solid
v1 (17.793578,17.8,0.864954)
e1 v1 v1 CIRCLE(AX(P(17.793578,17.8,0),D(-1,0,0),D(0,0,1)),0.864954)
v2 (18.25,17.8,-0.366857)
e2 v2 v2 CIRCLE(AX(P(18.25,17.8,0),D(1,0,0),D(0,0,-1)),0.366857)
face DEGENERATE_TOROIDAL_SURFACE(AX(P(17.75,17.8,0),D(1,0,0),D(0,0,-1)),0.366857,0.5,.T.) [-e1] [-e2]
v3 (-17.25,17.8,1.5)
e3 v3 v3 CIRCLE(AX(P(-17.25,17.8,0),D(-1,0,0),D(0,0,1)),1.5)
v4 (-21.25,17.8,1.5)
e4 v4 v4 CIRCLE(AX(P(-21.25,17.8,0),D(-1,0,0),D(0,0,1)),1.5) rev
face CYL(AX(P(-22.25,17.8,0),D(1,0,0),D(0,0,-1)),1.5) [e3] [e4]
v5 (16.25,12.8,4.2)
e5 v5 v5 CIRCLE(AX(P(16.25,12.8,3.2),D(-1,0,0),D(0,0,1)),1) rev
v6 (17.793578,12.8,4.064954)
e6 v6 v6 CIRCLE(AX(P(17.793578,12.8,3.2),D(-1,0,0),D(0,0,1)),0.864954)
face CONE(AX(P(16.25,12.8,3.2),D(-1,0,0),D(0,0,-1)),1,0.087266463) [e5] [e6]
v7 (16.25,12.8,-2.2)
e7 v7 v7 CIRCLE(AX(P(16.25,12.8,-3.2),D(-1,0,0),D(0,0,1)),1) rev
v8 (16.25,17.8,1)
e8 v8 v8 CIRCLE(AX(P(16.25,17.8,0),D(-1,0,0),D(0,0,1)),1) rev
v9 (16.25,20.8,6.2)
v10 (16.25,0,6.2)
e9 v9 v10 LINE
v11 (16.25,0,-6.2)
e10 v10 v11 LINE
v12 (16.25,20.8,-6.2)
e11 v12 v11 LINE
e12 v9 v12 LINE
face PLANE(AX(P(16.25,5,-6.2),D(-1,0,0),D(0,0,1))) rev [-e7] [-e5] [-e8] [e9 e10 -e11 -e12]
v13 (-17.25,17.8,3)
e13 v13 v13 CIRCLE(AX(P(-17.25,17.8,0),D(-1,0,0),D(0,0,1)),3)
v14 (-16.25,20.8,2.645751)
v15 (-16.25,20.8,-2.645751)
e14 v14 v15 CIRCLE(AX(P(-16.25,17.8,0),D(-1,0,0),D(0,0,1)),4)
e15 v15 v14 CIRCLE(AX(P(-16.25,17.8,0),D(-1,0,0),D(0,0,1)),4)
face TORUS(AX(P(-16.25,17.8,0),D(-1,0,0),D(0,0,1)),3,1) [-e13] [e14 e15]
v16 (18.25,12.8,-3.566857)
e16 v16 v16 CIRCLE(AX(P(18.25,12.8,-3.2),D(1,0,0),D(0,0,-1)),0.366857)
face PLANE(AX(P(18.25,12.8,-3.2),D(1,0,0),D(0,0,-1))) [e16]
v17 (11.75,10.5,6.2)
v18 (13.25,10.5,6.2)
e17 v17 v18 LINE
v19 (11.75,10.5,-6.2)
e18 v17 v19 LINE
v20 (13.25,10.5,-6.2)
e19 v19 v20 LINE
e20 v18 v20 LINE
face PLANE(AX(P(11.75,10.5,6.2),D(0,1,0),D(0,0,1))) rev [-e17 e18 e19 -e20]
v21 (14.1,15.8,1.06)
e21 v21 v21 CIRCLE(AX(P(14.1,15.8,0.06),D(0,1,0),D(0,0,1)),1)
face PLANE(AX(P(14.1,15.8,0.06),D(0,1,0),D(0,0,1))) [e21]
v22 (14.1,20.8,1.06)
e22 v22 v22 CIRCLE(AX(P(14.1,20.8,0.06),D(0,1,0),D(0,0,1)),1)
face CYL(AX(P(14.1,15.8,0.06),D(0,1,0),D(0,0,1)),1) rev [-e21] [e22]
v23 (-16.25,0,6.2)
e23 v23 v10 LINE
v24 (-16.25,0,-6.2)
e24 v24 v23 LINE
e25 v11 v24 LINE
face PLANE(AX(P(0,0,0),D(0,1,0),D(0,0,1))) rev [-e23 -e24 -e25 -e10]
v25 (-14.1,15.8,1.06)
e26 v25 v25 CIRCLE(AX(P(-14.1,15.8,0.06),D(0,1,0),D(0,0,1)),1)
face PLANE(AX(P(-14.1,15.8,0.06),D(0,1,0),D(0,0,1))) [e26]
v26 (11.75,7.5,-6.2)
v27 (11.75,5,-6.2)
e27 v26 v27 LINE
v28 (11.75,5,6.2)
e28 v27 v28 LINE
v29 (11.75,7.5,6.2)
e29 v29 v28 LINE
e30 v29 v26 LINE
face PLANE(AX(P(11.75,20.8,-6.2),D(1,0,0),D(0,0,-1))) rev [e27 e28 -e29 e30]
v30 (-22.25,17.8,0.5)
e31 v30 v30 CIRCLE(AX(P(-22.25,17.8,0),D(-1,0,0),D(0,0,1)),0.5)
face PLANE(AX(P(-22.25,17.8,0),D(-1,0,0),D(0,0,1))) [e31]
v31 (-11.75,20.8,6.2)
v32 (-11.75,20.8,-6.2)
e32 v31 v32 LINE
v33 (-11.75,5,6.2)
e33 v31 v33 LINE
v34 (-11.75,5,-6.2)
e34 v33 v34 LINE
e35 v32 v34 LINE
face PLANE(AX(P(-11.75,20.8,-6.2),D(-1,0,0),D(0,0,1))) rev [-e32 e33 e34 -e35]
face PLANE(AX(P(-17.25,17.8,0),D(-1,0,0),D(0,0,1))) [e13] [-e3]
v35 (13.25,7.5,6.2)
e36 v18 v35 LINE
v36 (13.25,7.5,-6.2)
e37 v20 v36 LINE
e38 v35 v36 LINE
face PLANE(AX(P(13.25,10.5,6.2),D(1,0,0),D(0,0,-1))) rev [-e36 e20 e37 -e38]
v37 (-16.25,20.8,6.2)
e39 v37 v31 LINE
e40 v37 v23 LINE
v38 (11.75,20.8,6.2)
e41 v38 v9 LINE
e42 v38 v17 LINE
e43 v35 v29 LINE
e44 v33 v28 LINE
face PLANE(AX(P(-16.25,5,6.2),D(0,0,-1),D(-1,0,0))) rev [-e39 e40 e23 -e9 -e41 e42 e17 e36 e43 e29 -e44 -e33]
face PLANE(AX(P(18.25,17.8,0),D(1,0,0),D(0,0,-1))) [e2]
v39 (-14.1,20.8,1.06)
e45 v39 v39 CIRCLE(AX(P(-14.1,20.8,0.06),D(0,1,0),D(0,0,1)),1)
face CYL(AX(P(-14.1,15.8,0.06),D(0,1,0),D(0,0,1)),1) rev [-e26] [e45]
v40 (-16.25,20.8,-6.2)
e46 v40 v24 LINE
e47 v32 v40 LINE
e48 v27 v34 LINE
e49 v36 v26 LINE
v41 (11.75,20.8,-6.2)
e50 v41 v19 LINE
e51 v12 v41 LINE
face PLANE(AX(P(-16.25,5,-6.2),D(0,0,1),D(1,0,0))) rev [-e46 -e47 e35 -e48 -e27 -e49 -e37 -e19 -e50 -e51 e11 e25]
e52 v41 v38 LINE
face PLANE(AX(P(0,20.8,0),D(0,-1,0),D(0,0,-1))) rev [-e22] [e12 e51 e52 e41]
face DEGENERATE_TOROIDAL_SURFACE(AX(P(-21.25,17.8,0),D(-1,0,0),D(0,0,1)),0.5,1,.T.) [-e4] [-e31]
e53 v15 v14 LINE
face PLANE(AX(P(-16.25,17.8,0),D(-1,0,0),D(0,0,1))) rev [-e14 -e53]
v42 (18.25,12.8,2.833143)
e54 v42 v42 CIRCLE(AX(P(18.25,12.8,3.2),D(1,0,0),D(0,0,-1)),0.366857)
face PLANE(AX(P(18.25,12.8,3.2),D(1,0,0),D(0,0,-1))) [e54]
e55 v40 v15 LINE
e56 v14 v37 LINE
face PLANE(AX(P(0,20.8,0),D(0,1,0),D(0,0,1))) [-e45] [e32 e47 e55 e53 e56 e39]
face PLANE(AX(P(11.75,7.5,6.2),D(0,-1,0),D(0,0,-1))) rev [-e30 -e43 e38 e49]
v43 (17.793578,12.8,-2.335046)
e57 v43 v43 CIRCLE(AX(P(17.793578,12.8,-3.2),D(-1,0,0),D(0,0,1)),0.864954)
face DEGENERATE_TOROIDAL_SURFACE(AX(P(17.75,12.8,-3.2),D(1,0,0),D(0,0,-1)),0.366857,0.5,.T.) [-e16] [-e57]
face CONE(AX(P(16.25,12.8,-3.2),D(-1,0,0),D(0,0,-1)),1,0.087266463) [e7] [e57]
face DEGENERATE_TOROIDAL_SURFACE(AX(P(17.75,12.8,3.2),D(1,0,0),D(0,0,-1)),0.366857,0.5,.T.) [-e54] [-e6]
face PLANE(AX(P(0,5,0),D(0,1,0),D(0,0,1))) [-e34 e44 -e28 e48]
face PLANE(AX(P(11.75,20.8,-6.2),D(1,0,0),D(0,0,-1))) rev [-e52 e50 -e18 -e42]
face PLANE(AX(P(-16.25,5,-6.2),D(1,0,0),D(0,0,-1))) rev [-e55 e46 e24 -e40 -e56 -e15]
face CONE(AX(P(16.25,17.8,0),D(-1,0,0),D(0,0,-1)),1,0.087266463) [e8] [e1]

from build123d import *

# Parameters (mm, degrees)
SKETCH1_W                     = 32.5
SKETCH1_H                     = 12.4
BOSS_EXTRUDE1_DEPTH           = 5
SKETCH3_W                     = 4.5
SKETCH3_H                     = 12.4
BOSS_EXTRUDE2_DEPTH           = 15.8
SKETCH4_R                     = 1
CUT_EXTRUDE1_DEPTH            = 5
SKETCH5_R                     = 1
BOSS_EXTRUDE3_DEPTH           = 2
BOSS_EXTRUDE3_DRAFT           = 5
BOSS_EXTRUDE3_PROFILE_2_DEPTH = 2
BOSS_EXTRUDE3_PROFILE_2_DRAFT = 5
BOSS_EXTRUDE3_PROFILE_3_DEPTH = 2
BOSS_EXTRUDE3_PROFILE_3_DRAFT = 5
SKETCH6_R                     = 4
BOSS_EXTRUDE4_DEPTH           = 1
SKETCH7_R                     = 1.5
BOSS_EXTRUDE5_DEPTH           = 5
FILLET1_R                     = 1
FILLET2_R                     = 1
FILLET3_R                     = 0.5
SKETCH10_W                    = 1.5
SKETCH10_H                    = 3
CUT_EXTRUDE4_DEPTH            = 34.527041325


with BuildPart() as part:
    # Sketch1 → Boss-Extrude1 (new body)
    with BuildSketch(Plane(origin=(0, 0, 0), x_dir=(1, 0, 0), z_dir=(0, 1, 0))):
        Rectangle(SKETCH1_W, SKETCH1_H)
    extrude(amount=BOSS_EXTRUDE1_DEPTH)

    # Sketch3 → Boss-Extrude2 (add)
    with BuildSketch(Plane(origin=(0, 5, 0), x_dir=(1, 0, 0), z_dir=(0, 1, 0))):
        with Locations((-14, 0)):
            Rectangle(SKETCH3_W, SKETCH3_H)
        with Locations((14, 0)):
            Rectangle(SKETCH3_W, SKETCH3_H)
    extrude(amount=BOSS_EXTRUDE2_DEPTH)

    # Sketch4 → Cut-Extrude1 (cut)
    with BuildSketch(Plane(origin=(0, 20.8, 0), x_dir=(1, 0, 0), z_dir=(0, 1, 0))):
        with Locations(Location((14.1, -0.06, 0), (0, 0, 270))):
            Circle(SKETCH4_R)
        with Locations(Location((-14.1, -0.06, 0), (0, 0, 270))):
            Circle(SKETCH4_R)
    extrude(amount=-CUT_EXTRUDE1_DEPTH, mode=Mode.SUBTRACT)


with BuildPart() as boss_extrude3_tool:
    # Sketch5 → Boss-Extrude3 (with draft: the straight prism first)
    with BuildSketch(Plane(origin=(16.25, 0, 0), x_dir=(0, 0, -1), z_dir=(1, 0, 0))):
        with Locations((0, 17.8)):
            Circle(SKETCH5_R)
    extrude(amount=BOSS_EXTRUDE3_DEPTH)
    # Boss-Extrude3: the draft: its side faces are tilted about the plane it starts from
    boss_extrude3_sides = [boss_extrude3_tool.faces().sort_by_distance(p)[0] for p in [
        (17.25, 17.8, 1),
    ]]
    draft(boss_extrude3_sides, Plane(origin=(16.25, 0, 0), x_dir=(0, 0, -1), z_dir=(1, 0, 0)), BOSS_EXTRUDE3_DRAFT)


with BuildPart() as part_1:
    add(part.part)

    # Boss-Extrude3: add boss_extrude3_tool
    add(boss_extrude3_tool.part)


with BuildPart() as boss_extrude3_profile_2_tool:
    # Sketch5 → Boss-Extrude3 profile 2 (with draft: the straight prism first)
    with BuildSketch(Plane(origin=(16.25, 0, 0), x_dir=(0, 0, -1), z_dir=(1, 0, 0))):
        with Locations((3.2, 12.8)):
            Circle(SKETCH5_R)
    extrude(amount=BOSS_EXTRUDE3_PROFILE_2_DEPTH)
    # Boss-Extrude3 profile 2: the draft: its side faces are tilted about the plane it starts from
    boss_extrude3_profile_2_sides = [boss_extrude3_profile_2_tool.faces().sort_by_distance(p)[0] for p in [
        (17.25, 12.8, -2.2),
    ]]
    draft(boss_extrude3_profile_2_sides, Plane(origin=(16.25, 0, 0), x_dir=(0, 0, -1), z_dir=(1, 0, 0)), BOSS_EXTRUDE3_PROFILE_2_DRAFT)


with BuildPart() as part_2:
    add(part_1.part)

    # Boss-Extrude3 profile 2: add boss_extrude3_profile_2_tool
    add(boss_extrude3_profile_2_tool.part)


with BuildPart() as boss_extrude3_profile_3_tool:
    # Sketch5 → Boss-Extrude3 profile 3 (with draft: the straight prism first)
    with BuildSketch(Plane(origin=(16.25, 0, 0), x_dir=(0, 0, -1), z_dir=(1, 0, 0))):
        with Locations((-3.2, 12.8)):
            Circle(SKETCH5_R)
    extrude(amount=BOSS_EXTRUDE3_PROFILE_3_DEPTH)
    # Boss-Extrude3 profile 3: the draft: its side faces are tilted about the plane it starts from
    boss_extrude3_profile_3_sides = [boss_extrude3_profile_3_tool.faces().sort_by_distance(p)[0] for p in [
        (17.25, 12.8, 4.2),
    ]]
    draft(boss_extrude3_profile_3_sides, Plane(origin=(16.25, 0, 0), x_dir=(0, 0, -1), z_dir=(1, 0, 0)), BOSS_EXTRUDE3_PROFILE_3_DRAFT)


with BuildPart() as part_3:
    add(part_2.part)

    # Boss-Extrude3 profile 3: add boss_extrude3_profile_3_tool
    add(boss_extrude3_profile_3_tool.part)

    # Sketch6 → Boss-Extrude4 (add)
    with BuildSketch(Plane.ZY.offset(16.25)):
        with Locations(Location((0, 17.8, 0), (0, 0, 131.409622109))):
            Circle(SKETCH6_R)
    extrude(amount=BOSS_EXTRUDE4_DEPTH)

    # Sketch7 → Boss-Extrude5 (add)
    with BuildSketch(Plane.ZY.offset(17.25)):
        with Locations((0, 17.8)):
            Circle(SKETCH7_R)
    extrude(amount=BOSS_EXTRUDE5_DEPTH)

    # Fillet1
    fillet1_edges = [part_3.edges().sort_by_distance(p)[0] for p in [
        (-22.25, 17.8, -1.5),
    ]]
    fillet(fillet1_edges, radius=FILLET1_R)

    # Fillet2
    fillet2_edges = [part_3.edges().sort_by_distance(p)[0] for p in [
        (-17.25, 14.8, 2.645751311),
    ]]
    fillet(fillet2_edges, radius=FILLET2_R - 0.0001)  # a hair under: the kernel refuses the full size

    # Fillet3
    fillet3_edges = [part_3.edges().sort_by_distance(p)[0] for p in [
        (18.25, 17.8, 0.825022673),
        (18.25, 12.8, -2.374977327),
        (18.25, 12.8, 4.025022673),
    ]]
    fillet(fillet3_edges, radius=FILLET3_R)

    # Sketch10 → Cut-Extrude4 (cut, through all)
    with BuildSketch(Plane(origin=(0, 0, -6.2), x_dir=(-1, 0, 0), z_dir=(0, 0, -1))):
        with Locations((-12.5, 9)):
            Rectangle(SKETCH10_W, SKETCH10_H)
    extrude(amount=-CUT_EXTRUDE4_DEPTH, mode=Mode.SUBTRACT)


solid = part_3.part
